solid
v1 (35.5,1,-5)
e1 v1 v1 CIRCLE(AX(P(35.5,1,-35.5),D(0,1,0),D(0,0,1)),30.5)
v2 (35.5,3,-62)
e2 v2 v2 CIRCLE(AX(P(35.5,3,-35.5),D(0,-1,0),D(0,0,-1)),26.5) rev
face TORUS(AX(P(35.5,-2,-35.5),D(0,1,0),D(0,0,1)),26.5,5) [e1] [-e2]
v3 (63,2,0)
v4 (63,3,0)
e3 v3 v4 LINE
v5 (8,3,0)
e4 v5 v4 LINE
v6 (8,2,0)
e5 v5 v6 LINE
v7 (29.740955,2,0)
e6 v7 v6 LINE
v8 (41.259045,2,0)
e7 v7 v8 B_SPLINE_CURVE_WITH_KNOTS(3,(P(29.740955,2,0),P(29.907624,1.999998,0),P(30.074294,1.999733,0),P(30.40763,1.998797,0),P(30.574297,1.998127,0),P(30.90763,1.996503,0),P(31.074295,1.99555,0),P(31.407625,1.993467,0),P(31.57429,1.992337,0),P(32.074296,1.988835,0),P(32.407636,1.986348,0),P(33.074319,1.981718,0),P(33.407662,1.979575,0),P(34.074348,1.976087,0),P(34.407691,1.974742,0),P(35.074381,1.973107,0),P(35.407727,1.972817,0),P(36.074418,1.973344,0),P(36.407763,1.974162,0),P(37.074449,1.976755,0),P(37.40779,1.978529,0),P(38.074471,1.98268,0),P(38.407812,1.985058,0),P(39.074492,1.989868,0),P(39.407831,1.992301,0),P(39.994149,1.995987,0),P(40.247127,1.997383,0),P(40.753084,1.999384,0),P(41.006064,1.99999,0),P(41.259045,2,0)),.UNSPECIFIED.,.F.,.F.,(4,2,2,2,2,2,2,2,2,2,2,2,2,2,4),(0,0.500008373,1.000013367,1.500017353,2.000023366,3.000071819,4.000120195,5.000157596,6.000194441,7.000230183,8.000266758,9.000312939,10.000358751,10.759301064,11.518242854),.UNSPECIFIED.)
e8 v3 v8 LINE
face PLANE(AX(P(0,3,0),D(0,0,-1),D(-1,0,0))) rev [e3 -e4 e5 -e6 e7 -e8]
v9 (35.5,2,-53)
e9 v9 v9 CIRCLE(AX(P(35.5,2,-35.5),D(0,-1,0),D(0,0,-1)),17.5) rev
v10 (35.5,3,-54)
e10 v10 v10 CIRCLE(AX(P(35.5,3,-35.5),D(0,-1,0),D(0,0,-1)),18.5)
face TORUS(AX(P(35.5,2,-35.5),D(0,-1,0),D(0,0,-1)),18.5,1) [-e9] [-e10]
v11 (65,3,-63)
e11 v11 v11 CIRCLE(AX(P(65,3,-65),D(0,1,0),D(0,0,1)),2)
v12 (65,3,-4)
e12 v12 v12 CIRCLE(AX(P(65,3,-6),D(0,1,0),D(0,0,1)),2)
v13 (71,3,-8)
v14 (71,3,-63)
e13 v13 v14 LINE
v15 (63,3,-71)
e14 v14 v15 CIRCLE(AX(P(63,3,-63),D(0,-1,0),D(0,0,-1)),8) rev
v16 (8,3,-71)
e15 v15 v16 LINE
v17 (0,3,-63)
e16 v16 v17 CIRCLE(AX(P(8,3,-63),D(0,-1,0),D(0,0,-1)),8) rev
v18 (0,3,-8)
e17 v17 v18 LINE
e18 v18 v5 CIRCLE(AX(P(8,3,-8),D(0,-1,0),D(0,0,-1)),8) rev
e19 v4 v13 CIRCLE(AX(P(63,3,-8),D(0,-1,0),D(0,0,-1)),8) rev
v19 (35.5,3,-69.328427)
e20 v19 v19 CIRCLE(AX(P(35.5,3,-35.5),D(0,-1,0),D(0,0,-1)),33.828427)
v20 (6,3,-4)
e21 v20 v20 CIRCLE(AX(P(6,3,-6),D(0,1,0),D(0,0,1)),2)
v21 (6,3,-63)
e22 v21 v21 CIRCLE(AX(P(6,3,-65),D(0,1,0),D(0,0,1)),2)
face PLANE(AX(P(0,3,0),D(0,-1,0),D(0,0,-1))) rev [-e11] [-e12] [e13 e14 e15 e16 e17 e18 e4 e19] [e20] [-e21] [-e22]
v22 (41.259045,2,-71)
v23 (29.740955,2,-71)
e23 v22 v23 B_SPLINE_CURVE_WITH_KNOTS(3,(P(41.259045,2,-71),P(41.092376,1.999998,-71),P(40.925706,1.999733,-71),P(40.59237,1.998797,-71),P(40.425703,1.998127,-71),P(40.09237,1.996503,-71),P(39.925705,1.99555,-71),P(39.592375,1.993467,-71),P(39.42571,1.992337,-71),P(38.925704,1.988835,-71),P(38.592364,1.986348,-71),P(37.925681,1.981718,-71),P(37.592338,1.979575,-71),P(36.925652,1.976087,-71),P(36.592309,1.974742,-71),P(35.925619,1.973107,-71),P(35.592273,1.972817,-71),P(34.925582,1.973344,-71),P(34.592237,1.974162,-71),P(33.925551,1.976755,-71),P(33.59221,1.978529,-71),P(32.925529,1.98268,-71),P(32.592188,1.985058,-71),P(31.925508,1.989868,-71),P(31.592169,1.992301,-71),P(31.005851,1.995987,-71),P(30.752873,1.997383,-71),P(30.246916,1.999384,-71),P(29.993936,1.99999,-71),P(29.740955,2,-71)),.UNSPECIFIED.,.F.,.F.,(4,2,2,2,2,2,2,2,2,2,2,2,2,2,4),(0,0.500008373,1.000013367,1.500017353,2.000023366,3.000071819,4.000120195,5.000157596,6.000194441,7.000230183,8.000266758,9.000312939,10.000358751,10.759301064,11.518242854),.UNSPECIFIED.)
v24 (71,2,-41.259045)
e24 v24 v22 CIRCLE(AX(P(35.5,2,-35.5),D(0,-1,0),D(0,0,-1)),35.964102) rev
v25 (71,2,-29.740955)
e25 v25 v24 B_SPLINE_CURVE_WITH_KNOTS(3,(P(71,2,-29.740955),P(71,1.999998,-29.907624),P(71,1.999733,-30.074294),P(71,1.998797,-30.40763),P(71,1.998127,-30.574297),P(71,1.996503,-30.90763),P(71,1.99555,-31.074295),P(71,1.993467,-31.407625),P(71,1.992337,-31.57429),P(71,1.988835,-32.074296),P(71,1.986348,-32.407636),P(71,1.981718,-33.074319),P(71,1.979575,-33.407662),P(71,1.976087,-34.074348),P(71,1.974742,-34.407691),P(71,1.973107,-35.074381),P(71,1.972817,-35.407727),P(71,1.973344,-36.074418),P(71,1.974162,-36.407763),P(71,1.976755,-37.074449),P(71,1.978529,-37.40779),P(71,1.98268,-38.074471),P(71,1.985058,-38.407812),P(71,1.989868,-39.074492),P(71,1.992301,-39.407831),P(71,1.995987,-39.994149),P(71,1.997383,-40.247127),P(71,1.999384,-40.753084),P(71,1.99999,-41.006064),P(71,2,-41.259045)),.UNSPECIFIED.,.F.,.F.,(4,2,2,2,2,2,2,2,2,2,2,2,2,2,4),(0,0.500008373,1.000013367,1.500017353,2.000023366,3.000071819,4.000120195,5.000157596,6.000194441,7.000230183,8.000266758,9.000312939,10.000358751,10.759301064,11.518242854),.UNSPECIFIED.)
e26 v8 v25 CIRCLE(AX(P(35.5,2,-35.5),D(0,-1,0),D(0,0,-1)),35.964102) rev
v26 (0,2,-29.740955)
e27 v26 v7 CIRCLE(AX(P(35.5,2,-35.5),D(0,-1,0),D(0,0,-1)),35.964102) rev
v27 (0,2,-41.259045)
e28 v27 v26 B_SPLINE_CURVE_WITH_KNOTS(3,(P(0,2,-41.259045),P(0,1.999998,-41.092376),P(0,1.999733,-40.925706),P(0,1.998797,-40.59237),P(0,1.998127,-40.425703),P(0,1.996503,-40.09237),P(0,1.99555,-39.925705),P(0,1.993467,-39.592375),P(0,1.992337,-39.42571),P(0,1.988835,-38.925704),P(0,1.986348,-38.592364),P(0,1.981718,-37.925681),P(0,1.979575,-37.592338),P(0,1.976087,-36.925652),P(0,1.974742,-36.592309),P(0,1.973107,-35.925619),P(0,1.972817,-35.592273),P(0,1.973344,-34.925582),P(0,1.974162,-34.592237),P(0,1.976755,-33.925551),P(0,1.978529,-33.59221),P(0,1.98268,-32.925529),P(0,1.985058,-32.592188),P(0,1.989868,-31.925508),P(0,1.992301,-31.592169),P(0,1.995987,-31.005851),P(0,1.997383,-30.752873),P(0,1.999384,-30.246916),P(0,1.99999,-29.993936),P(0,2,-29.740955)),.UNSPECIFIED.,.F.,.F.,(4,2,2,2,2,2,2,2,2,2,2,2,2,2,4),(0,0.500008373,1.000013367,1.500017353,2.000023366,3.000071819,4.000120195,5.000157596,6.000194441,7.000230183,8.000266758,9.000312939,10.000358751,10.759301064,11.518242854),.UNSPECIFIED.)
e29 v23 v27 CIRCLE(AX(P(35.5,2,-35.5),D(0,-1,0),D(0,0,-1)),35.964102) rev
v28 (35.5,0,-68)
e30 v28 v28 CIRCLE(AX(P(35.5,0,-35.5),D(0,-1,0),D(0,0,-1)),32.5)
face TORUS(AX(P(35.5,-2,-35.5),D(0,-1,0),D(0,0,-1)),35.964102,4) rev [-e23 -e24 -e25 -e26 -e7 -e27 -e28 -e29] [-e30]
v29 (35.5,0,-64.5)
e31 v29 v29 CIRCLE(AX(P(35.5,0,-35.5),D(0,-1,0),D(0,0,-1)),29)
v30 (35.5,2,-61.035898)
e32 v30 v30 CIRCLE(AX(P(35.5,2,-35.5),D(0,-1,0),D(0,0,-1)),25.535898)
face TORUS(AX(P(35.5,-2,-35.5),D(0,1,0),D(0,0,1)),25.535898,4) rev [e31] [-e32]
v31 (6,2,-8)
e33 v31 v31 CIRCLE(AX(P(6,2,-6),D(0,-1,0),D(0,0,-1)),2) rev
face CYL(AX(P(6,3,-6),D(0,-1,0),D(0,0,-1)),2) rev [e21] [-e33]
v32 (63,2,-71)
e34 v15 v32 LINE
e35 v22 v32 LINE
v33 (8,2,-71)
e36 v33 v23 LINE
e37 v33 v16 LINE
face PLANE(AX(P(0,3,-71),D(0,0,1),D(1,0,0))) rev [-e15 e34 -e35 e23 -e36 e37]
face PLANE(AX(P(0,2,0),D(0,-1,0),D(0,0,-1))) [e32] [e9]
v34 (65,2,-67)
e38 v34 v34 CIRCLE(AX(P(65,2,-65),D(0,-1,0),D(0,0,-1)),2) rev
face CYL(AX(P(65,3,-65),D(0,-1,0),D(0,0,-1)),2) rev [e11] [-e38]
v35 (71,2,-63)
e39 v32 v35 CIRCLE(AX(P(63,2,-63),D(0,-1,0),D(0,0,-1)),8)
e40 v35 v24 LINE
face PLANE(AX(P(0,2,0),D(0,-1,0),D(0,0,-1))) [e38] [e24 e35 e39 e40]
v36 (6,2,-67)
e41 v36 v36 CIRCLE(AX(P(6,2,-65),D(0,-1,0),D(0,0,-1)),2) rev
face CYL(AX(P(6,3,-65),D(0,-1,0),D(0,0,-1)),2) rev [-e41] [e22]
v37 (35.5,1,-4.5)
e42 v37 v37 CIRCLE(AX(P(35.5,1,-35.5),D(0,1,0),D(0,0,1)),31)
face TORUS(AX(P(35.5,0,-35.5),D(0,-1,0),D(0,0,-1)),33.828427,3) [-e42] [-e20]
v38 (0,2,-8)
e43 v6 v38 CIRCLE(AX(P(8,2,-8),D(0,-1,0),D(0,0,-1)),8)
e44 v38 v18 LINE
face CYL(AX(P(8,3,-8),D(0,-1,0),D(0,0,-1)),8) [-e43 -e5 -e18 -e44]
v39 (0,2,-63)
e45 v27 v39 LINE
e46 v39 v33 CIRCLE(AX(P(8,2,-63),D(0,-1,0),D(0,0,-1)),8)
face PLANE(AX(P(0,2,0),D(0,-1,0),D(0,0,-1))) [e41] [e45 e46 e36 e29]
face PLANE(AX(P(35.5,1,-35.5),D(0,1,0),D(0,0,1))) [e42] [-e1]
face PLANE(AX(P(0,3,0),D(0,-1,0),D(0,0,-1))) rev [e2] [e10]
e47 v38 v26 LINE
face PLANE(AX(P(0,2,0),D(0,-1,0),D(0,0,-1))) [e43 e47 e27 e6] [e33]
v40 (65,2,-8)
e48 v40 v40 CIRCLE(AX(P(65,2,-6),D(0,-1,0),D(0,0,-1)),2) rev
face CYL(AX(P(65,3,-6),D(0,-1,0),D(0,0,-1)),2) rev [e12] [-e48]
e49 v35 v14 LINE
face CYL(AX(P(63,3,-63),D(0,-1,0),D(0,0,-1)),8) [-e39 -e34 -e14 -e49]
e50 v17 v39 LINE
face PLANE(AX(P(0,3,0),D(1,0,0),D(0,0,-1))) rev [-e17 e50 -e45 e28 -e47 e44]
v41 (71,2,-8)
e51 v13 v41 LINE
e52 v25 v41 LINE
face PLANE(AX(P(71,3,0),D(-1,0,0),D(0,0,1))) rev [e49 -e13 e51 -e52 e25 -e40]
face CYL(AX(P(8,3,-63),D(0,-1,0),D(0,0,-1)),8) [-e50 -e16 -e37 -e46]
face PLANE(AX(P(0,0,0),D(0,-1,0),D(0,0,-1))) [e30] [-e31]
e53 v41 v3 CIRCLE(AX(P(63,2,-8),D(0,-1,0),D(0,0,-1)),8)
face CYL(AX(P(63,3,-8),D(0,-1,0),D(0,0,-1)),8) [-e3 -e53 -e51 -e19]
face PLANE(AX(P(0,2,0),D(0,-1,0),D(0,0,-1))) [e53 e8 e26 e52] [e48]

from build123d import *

# Parameters (mm, degrees)
SKETCH1_W           = 71
SKETCH1_H           = 71
SKETCH1_R           = 2
SKETCH1_R_2         = 17.5
BOSS_EXTRUDE1_DEPTH = 3
FILLET2_R           = 8
SKETCH2_R           = 31
SKETCH2_R_2         = 30.5
CUT_EXTRUDE1_DEPTH  = 2
FILLET3_R           = 5
FILLET4_R           = 3
FILLET5_R           = 1
SKETCH4_R           = 32.5
SKETCH4_R_2         = 2
SKETCH4_R_3         = 29
SKETCH4_R_4         = 17.5
CUT_EXTRUDE4_DEPTH  = 2
FILLET8_R           = 4
FILLET9_R           = 4


with BuildPart() as part:
    # Sketch1 → Boss-Extrude1 (new body)
    with BuildSketch(Plane(origin=(0, 0, 0), x_dir=(1, 0, 0), z_dir=(0, 1, 0))):
        with Locations((35.5, 35.5)):
            Rectangle(SKETCH1_W, SKETCH1_H)
        with Locations(Location((6, 6, 0), (0, 0, 270))):
            Circle(SKETCH1_R, mode=Mode.SUBTRACT)
        with Locations(Location((65, 6, 0), (0, 0, 270))):
            Circle(SKETCH1_R, mode=Mode.SUBTRACT)
        with Locations(Location((65, 65, 0), (0, 0, 270))):
            Circle(SKETCH1_R, mode=Mode.SUBTRACT)
        with Locations(Location((6, 65, 0), (0, 0, 270))):
            Circle(SKETCH1_R, mode=Mode.SUBTRACT)
        with Locations(Location((35.5, 35.5, 0), (0, 0, 270))):
            Circle(SKETCH1_R_2, mode=Mode.SUBTRACT)
    extrude(amount=BOSS_EXTRUDE1_DEPTH)

    # Fillet2
    fillet2_edges = [part.edges().sort_by_distance(p)[0] for p in [
        (0, 1.5, -71),
        (71, 1.5, -71),
        (71, 1.5, 0),
        (0, 1.5, 0),
    ]]
    fillet(fillet2_edges, radius=FILLET2_R)

    # Sketch2 → Cut-Extrude1 (cut)
    with BuildSketch(Plane(origin=(0, 3, 0), x_dir=(1, 0, 0), z_dir=(0, 1, 0))):
        with Locations(Location((35.5, 35.5, 0), (0, 0, 270))):
            Circle(SKETCH2_R)
        with Locations(Location((35.5, 35.5, 0), (0, 0, 270))):
            Circle(SKETCH2_R_2, mode=Mode.SUBTRACT)
    extrude(amount=-CUT_EXTRUDE1_DEPTH, mode=Mode.SUBTRACT)

    # Fillet3
    # the kernel refuses this fillet: 5 mm, written as the material it takes off along each edge
    with BuildSketch(Plane(origin=(35.5, 3, -35.5), x_dir=(0, 0, 1), z_dir=(-1, 0, 0))) as fillet3_piece_1:
        with BuildLine():
            CenterArc((26.5, -5), FILLET3_R, 36.869897646, 53.130102354)
            Line((30.5, -2), (30.58, -1.94))
            ThreePointArc((30.58, -1.94), (30.6, -1), (30.6, 0))
            Line((30.6, 0), (30.5, 0.1))
            Line((30.5, 0.1), (26.5, 0.1))
            Line((26.5, 0.1), (26.5, 0))
        make_face()
    revolve(axis=Axis((35.5, 3, -35.5), (0, 1, 0)), mode=Mode.SUBTRACT)

    # Fillet4
    # the kernel refuses this fillet: 3 mm, written as the material it takes off along each edge
    with BuildSketch(Plane(origin=(35.5, 3, -35.5), x_dir=(0, 0, 1), z_dir=(-1, 0, 0))) as fillet4_piece_1:
        with BuildLine():
            CenterArc((33.828427125, -3), FILLET4_R, 90, 70.528779366)
            Line((31, -2), (30.943431458, -1.98))
            ThreePointArc((30.943431458, -1.98), (30.94, -1), (30.94, 0))
            Line((30.94, 0), (31, 0.06))
            Line((31, 0.06), (33.828427125, 0.06))
            Line((33.828427125, 0.06), (33.828427125, 0))
        make_face()
    revolve(axis=Axis((35.5, 3, -35.5), (0, 1, 0)), mode=Mode.SUBTRACT)

    # Fillet5
    fillet5_edges = [part.edges().sort_by_distance(p)[0] for p in [
        (35.5, 3, -53),
    ]]
    fillet(fillet5_edges, radius=FILLET5_R)

    # Sketch4 → Cut-Extrude4 (cut)
    # profile 1 of 2: a face of its own
    with BuildSketch(Plane(origin=(0, 0, 0), x_dir=(-1, 0, 0), z_dir=(0, -1, 0))):
        with BuildLine():
            ThreePointArc((-8, 0), (-2.343145751, 2.343145751), (0, 8))
            Line((0, 8), (0, 63))
            ThreePointArc((0, 63), (-2.343145751, 68.656854249), (-8, 71))
            Line((-8, 71), (-63, 71))
            ThreePointArc((-63, 71), (-68.656854249, 68.656854249), (-71, 63))
            Line((-71, 63), (-71, 8))
            ThreePointArc((-71, 8), (-68.656854249, 2.343145751), (-63, 0))
            Line((-63, 0), (-8, 0))
        make_face()
        with Locations(Location((-35.5, 35.5, 0), (0, 0, 90))):
            Circle(SKETCH4_R, mode=Mode.SUBTRACT)
        with Locations(Location((-6, 6, 0), (0, 0, 90))):
            Circle(SKETCH4_R_2, mode=Mode.SUBTRACT)
        with Locations(Location((-6, 65, 0), (0, 0, 90))):
            Circle(SKETCH4_R_2, mode=Mode.SUBTRACT)
        with Locations(Location((-65, 6, 0), (0, 0, 90))):
            Circle(SKETCH4_R_2, mode=Mode.SUBTRACT)
        with Locations(Location((-65, 65, 0), (0, 0, 90))):
            Circle(SKETCH4_R_2, mode=Mode.SUBTRACT)
    # profile 2 of 2: a face of its own
    with BuildSketch(Plane(origin=(0, 0, 0), x_dir=(-1, 0, 0), z_dir=(0, -1, 0))):
        with Locations(Location((-35.5, 35.5, 0), (0, 0, 90))):
            Circle(SKETCH4_R_3)
        with Locations((-35.5, 35.5)):
            Circle(SKETCH4_R_4, mode=Mode.SUBTRACT)
    extrude(amount=-CUT_EXTRUDE4_DEPTH, mode=Mode.SUBTRACT)

    # Fillet8
    # the kernel refuses this fillet: 4 mm, written as the material it adds along each edge
    with BuildSketch(Plane(origin=(35.5, 2, -35.5), x_dir=(0, 0, -1), z_dir=(-1, 0, 0))) as fillet8_piece_1:
        with BuildLine():
            CenterArc((25.535898385, 4), FILLET8_R, 270, 60)
            Line((25.535898385, 0), (25.535898385, -0.08))
            Line((25.535898385, -0.08), (29, -0.08))
            Line((29, -0.08), (29.08, 0))
            ThreePointArc((29.08, 0), (29.08, 1), (29.069282032, 1.96))
            Line((29.069282032, 1.96), (29, 2))
        make_face()
    revolve(axis=Axis((35.5, 2, -35.5), (0, -1, 0)))

    # Fillet9
    # the kernel refuses this fillet: 4 mm, written as the material it adds along each edge
    with BuildSketch(Plane(origin=(35.5, 2, -35.5), x_dir=(0, 0, -1), z_dir=(-1, 0, 0))) as fillet9_piece_1_section:
        with BuildLine():
            CenterArc((35.964101615, 4), FILLET9_R, 210, 60)
            Line((35.964101615, 0), (35.964101615, -0.08))
            Line((35.964101615, -0.08), (32.5, -0.08))
            Line((32.5, -0.08), (32.42, 0))
            ThreePointArc((32.42, 0), (32.42, 1), (32.430717968, 1.96))
            Line((32.430717968, 1.96), (32.5, 2))
        make_face()
    fillet9_piece_1 = revolve(axis=Axis((35.5, 2, -35.5), (0, -1, 0)), mode=Mode.PRIVATE)
    fillet9_piece_1 = split(fillet9_piece_1, bisect_by=Plane(origin=(35.5, 1.533400125, 0), z_dir=(0, 0, -1)), keep=Keep.TOP, mode=Mode.PRIVATE)
    fillet9_piece_1 = split(fillet9_piece_1, bisect_by=Plane(origin=(0, 1.533400125, -1.575907898), z_dir=(1, 0, 0)), keep=Keep.TOP, mode=Mode.PRIVATE)
    fillet9_piece_1 = split(fillet9_piece_1, bisect_by=Plane(origin=(35.5, 1.533400125, -71), z_dir=(0, 0, 1)), keep=Keep.TOP, mode=Mode.PRIVATE)
    fillet9_piece_1 = split(fillet9_piece_1, bisect_by=Plane(origin=(71, 1.533400125, -1.575907898), z_dir=(-1, 0, 0)), keep=Keep.TOP, mode=Mode.PRIVATE)
    add(fillet9_piece_1)


solid = part.part
